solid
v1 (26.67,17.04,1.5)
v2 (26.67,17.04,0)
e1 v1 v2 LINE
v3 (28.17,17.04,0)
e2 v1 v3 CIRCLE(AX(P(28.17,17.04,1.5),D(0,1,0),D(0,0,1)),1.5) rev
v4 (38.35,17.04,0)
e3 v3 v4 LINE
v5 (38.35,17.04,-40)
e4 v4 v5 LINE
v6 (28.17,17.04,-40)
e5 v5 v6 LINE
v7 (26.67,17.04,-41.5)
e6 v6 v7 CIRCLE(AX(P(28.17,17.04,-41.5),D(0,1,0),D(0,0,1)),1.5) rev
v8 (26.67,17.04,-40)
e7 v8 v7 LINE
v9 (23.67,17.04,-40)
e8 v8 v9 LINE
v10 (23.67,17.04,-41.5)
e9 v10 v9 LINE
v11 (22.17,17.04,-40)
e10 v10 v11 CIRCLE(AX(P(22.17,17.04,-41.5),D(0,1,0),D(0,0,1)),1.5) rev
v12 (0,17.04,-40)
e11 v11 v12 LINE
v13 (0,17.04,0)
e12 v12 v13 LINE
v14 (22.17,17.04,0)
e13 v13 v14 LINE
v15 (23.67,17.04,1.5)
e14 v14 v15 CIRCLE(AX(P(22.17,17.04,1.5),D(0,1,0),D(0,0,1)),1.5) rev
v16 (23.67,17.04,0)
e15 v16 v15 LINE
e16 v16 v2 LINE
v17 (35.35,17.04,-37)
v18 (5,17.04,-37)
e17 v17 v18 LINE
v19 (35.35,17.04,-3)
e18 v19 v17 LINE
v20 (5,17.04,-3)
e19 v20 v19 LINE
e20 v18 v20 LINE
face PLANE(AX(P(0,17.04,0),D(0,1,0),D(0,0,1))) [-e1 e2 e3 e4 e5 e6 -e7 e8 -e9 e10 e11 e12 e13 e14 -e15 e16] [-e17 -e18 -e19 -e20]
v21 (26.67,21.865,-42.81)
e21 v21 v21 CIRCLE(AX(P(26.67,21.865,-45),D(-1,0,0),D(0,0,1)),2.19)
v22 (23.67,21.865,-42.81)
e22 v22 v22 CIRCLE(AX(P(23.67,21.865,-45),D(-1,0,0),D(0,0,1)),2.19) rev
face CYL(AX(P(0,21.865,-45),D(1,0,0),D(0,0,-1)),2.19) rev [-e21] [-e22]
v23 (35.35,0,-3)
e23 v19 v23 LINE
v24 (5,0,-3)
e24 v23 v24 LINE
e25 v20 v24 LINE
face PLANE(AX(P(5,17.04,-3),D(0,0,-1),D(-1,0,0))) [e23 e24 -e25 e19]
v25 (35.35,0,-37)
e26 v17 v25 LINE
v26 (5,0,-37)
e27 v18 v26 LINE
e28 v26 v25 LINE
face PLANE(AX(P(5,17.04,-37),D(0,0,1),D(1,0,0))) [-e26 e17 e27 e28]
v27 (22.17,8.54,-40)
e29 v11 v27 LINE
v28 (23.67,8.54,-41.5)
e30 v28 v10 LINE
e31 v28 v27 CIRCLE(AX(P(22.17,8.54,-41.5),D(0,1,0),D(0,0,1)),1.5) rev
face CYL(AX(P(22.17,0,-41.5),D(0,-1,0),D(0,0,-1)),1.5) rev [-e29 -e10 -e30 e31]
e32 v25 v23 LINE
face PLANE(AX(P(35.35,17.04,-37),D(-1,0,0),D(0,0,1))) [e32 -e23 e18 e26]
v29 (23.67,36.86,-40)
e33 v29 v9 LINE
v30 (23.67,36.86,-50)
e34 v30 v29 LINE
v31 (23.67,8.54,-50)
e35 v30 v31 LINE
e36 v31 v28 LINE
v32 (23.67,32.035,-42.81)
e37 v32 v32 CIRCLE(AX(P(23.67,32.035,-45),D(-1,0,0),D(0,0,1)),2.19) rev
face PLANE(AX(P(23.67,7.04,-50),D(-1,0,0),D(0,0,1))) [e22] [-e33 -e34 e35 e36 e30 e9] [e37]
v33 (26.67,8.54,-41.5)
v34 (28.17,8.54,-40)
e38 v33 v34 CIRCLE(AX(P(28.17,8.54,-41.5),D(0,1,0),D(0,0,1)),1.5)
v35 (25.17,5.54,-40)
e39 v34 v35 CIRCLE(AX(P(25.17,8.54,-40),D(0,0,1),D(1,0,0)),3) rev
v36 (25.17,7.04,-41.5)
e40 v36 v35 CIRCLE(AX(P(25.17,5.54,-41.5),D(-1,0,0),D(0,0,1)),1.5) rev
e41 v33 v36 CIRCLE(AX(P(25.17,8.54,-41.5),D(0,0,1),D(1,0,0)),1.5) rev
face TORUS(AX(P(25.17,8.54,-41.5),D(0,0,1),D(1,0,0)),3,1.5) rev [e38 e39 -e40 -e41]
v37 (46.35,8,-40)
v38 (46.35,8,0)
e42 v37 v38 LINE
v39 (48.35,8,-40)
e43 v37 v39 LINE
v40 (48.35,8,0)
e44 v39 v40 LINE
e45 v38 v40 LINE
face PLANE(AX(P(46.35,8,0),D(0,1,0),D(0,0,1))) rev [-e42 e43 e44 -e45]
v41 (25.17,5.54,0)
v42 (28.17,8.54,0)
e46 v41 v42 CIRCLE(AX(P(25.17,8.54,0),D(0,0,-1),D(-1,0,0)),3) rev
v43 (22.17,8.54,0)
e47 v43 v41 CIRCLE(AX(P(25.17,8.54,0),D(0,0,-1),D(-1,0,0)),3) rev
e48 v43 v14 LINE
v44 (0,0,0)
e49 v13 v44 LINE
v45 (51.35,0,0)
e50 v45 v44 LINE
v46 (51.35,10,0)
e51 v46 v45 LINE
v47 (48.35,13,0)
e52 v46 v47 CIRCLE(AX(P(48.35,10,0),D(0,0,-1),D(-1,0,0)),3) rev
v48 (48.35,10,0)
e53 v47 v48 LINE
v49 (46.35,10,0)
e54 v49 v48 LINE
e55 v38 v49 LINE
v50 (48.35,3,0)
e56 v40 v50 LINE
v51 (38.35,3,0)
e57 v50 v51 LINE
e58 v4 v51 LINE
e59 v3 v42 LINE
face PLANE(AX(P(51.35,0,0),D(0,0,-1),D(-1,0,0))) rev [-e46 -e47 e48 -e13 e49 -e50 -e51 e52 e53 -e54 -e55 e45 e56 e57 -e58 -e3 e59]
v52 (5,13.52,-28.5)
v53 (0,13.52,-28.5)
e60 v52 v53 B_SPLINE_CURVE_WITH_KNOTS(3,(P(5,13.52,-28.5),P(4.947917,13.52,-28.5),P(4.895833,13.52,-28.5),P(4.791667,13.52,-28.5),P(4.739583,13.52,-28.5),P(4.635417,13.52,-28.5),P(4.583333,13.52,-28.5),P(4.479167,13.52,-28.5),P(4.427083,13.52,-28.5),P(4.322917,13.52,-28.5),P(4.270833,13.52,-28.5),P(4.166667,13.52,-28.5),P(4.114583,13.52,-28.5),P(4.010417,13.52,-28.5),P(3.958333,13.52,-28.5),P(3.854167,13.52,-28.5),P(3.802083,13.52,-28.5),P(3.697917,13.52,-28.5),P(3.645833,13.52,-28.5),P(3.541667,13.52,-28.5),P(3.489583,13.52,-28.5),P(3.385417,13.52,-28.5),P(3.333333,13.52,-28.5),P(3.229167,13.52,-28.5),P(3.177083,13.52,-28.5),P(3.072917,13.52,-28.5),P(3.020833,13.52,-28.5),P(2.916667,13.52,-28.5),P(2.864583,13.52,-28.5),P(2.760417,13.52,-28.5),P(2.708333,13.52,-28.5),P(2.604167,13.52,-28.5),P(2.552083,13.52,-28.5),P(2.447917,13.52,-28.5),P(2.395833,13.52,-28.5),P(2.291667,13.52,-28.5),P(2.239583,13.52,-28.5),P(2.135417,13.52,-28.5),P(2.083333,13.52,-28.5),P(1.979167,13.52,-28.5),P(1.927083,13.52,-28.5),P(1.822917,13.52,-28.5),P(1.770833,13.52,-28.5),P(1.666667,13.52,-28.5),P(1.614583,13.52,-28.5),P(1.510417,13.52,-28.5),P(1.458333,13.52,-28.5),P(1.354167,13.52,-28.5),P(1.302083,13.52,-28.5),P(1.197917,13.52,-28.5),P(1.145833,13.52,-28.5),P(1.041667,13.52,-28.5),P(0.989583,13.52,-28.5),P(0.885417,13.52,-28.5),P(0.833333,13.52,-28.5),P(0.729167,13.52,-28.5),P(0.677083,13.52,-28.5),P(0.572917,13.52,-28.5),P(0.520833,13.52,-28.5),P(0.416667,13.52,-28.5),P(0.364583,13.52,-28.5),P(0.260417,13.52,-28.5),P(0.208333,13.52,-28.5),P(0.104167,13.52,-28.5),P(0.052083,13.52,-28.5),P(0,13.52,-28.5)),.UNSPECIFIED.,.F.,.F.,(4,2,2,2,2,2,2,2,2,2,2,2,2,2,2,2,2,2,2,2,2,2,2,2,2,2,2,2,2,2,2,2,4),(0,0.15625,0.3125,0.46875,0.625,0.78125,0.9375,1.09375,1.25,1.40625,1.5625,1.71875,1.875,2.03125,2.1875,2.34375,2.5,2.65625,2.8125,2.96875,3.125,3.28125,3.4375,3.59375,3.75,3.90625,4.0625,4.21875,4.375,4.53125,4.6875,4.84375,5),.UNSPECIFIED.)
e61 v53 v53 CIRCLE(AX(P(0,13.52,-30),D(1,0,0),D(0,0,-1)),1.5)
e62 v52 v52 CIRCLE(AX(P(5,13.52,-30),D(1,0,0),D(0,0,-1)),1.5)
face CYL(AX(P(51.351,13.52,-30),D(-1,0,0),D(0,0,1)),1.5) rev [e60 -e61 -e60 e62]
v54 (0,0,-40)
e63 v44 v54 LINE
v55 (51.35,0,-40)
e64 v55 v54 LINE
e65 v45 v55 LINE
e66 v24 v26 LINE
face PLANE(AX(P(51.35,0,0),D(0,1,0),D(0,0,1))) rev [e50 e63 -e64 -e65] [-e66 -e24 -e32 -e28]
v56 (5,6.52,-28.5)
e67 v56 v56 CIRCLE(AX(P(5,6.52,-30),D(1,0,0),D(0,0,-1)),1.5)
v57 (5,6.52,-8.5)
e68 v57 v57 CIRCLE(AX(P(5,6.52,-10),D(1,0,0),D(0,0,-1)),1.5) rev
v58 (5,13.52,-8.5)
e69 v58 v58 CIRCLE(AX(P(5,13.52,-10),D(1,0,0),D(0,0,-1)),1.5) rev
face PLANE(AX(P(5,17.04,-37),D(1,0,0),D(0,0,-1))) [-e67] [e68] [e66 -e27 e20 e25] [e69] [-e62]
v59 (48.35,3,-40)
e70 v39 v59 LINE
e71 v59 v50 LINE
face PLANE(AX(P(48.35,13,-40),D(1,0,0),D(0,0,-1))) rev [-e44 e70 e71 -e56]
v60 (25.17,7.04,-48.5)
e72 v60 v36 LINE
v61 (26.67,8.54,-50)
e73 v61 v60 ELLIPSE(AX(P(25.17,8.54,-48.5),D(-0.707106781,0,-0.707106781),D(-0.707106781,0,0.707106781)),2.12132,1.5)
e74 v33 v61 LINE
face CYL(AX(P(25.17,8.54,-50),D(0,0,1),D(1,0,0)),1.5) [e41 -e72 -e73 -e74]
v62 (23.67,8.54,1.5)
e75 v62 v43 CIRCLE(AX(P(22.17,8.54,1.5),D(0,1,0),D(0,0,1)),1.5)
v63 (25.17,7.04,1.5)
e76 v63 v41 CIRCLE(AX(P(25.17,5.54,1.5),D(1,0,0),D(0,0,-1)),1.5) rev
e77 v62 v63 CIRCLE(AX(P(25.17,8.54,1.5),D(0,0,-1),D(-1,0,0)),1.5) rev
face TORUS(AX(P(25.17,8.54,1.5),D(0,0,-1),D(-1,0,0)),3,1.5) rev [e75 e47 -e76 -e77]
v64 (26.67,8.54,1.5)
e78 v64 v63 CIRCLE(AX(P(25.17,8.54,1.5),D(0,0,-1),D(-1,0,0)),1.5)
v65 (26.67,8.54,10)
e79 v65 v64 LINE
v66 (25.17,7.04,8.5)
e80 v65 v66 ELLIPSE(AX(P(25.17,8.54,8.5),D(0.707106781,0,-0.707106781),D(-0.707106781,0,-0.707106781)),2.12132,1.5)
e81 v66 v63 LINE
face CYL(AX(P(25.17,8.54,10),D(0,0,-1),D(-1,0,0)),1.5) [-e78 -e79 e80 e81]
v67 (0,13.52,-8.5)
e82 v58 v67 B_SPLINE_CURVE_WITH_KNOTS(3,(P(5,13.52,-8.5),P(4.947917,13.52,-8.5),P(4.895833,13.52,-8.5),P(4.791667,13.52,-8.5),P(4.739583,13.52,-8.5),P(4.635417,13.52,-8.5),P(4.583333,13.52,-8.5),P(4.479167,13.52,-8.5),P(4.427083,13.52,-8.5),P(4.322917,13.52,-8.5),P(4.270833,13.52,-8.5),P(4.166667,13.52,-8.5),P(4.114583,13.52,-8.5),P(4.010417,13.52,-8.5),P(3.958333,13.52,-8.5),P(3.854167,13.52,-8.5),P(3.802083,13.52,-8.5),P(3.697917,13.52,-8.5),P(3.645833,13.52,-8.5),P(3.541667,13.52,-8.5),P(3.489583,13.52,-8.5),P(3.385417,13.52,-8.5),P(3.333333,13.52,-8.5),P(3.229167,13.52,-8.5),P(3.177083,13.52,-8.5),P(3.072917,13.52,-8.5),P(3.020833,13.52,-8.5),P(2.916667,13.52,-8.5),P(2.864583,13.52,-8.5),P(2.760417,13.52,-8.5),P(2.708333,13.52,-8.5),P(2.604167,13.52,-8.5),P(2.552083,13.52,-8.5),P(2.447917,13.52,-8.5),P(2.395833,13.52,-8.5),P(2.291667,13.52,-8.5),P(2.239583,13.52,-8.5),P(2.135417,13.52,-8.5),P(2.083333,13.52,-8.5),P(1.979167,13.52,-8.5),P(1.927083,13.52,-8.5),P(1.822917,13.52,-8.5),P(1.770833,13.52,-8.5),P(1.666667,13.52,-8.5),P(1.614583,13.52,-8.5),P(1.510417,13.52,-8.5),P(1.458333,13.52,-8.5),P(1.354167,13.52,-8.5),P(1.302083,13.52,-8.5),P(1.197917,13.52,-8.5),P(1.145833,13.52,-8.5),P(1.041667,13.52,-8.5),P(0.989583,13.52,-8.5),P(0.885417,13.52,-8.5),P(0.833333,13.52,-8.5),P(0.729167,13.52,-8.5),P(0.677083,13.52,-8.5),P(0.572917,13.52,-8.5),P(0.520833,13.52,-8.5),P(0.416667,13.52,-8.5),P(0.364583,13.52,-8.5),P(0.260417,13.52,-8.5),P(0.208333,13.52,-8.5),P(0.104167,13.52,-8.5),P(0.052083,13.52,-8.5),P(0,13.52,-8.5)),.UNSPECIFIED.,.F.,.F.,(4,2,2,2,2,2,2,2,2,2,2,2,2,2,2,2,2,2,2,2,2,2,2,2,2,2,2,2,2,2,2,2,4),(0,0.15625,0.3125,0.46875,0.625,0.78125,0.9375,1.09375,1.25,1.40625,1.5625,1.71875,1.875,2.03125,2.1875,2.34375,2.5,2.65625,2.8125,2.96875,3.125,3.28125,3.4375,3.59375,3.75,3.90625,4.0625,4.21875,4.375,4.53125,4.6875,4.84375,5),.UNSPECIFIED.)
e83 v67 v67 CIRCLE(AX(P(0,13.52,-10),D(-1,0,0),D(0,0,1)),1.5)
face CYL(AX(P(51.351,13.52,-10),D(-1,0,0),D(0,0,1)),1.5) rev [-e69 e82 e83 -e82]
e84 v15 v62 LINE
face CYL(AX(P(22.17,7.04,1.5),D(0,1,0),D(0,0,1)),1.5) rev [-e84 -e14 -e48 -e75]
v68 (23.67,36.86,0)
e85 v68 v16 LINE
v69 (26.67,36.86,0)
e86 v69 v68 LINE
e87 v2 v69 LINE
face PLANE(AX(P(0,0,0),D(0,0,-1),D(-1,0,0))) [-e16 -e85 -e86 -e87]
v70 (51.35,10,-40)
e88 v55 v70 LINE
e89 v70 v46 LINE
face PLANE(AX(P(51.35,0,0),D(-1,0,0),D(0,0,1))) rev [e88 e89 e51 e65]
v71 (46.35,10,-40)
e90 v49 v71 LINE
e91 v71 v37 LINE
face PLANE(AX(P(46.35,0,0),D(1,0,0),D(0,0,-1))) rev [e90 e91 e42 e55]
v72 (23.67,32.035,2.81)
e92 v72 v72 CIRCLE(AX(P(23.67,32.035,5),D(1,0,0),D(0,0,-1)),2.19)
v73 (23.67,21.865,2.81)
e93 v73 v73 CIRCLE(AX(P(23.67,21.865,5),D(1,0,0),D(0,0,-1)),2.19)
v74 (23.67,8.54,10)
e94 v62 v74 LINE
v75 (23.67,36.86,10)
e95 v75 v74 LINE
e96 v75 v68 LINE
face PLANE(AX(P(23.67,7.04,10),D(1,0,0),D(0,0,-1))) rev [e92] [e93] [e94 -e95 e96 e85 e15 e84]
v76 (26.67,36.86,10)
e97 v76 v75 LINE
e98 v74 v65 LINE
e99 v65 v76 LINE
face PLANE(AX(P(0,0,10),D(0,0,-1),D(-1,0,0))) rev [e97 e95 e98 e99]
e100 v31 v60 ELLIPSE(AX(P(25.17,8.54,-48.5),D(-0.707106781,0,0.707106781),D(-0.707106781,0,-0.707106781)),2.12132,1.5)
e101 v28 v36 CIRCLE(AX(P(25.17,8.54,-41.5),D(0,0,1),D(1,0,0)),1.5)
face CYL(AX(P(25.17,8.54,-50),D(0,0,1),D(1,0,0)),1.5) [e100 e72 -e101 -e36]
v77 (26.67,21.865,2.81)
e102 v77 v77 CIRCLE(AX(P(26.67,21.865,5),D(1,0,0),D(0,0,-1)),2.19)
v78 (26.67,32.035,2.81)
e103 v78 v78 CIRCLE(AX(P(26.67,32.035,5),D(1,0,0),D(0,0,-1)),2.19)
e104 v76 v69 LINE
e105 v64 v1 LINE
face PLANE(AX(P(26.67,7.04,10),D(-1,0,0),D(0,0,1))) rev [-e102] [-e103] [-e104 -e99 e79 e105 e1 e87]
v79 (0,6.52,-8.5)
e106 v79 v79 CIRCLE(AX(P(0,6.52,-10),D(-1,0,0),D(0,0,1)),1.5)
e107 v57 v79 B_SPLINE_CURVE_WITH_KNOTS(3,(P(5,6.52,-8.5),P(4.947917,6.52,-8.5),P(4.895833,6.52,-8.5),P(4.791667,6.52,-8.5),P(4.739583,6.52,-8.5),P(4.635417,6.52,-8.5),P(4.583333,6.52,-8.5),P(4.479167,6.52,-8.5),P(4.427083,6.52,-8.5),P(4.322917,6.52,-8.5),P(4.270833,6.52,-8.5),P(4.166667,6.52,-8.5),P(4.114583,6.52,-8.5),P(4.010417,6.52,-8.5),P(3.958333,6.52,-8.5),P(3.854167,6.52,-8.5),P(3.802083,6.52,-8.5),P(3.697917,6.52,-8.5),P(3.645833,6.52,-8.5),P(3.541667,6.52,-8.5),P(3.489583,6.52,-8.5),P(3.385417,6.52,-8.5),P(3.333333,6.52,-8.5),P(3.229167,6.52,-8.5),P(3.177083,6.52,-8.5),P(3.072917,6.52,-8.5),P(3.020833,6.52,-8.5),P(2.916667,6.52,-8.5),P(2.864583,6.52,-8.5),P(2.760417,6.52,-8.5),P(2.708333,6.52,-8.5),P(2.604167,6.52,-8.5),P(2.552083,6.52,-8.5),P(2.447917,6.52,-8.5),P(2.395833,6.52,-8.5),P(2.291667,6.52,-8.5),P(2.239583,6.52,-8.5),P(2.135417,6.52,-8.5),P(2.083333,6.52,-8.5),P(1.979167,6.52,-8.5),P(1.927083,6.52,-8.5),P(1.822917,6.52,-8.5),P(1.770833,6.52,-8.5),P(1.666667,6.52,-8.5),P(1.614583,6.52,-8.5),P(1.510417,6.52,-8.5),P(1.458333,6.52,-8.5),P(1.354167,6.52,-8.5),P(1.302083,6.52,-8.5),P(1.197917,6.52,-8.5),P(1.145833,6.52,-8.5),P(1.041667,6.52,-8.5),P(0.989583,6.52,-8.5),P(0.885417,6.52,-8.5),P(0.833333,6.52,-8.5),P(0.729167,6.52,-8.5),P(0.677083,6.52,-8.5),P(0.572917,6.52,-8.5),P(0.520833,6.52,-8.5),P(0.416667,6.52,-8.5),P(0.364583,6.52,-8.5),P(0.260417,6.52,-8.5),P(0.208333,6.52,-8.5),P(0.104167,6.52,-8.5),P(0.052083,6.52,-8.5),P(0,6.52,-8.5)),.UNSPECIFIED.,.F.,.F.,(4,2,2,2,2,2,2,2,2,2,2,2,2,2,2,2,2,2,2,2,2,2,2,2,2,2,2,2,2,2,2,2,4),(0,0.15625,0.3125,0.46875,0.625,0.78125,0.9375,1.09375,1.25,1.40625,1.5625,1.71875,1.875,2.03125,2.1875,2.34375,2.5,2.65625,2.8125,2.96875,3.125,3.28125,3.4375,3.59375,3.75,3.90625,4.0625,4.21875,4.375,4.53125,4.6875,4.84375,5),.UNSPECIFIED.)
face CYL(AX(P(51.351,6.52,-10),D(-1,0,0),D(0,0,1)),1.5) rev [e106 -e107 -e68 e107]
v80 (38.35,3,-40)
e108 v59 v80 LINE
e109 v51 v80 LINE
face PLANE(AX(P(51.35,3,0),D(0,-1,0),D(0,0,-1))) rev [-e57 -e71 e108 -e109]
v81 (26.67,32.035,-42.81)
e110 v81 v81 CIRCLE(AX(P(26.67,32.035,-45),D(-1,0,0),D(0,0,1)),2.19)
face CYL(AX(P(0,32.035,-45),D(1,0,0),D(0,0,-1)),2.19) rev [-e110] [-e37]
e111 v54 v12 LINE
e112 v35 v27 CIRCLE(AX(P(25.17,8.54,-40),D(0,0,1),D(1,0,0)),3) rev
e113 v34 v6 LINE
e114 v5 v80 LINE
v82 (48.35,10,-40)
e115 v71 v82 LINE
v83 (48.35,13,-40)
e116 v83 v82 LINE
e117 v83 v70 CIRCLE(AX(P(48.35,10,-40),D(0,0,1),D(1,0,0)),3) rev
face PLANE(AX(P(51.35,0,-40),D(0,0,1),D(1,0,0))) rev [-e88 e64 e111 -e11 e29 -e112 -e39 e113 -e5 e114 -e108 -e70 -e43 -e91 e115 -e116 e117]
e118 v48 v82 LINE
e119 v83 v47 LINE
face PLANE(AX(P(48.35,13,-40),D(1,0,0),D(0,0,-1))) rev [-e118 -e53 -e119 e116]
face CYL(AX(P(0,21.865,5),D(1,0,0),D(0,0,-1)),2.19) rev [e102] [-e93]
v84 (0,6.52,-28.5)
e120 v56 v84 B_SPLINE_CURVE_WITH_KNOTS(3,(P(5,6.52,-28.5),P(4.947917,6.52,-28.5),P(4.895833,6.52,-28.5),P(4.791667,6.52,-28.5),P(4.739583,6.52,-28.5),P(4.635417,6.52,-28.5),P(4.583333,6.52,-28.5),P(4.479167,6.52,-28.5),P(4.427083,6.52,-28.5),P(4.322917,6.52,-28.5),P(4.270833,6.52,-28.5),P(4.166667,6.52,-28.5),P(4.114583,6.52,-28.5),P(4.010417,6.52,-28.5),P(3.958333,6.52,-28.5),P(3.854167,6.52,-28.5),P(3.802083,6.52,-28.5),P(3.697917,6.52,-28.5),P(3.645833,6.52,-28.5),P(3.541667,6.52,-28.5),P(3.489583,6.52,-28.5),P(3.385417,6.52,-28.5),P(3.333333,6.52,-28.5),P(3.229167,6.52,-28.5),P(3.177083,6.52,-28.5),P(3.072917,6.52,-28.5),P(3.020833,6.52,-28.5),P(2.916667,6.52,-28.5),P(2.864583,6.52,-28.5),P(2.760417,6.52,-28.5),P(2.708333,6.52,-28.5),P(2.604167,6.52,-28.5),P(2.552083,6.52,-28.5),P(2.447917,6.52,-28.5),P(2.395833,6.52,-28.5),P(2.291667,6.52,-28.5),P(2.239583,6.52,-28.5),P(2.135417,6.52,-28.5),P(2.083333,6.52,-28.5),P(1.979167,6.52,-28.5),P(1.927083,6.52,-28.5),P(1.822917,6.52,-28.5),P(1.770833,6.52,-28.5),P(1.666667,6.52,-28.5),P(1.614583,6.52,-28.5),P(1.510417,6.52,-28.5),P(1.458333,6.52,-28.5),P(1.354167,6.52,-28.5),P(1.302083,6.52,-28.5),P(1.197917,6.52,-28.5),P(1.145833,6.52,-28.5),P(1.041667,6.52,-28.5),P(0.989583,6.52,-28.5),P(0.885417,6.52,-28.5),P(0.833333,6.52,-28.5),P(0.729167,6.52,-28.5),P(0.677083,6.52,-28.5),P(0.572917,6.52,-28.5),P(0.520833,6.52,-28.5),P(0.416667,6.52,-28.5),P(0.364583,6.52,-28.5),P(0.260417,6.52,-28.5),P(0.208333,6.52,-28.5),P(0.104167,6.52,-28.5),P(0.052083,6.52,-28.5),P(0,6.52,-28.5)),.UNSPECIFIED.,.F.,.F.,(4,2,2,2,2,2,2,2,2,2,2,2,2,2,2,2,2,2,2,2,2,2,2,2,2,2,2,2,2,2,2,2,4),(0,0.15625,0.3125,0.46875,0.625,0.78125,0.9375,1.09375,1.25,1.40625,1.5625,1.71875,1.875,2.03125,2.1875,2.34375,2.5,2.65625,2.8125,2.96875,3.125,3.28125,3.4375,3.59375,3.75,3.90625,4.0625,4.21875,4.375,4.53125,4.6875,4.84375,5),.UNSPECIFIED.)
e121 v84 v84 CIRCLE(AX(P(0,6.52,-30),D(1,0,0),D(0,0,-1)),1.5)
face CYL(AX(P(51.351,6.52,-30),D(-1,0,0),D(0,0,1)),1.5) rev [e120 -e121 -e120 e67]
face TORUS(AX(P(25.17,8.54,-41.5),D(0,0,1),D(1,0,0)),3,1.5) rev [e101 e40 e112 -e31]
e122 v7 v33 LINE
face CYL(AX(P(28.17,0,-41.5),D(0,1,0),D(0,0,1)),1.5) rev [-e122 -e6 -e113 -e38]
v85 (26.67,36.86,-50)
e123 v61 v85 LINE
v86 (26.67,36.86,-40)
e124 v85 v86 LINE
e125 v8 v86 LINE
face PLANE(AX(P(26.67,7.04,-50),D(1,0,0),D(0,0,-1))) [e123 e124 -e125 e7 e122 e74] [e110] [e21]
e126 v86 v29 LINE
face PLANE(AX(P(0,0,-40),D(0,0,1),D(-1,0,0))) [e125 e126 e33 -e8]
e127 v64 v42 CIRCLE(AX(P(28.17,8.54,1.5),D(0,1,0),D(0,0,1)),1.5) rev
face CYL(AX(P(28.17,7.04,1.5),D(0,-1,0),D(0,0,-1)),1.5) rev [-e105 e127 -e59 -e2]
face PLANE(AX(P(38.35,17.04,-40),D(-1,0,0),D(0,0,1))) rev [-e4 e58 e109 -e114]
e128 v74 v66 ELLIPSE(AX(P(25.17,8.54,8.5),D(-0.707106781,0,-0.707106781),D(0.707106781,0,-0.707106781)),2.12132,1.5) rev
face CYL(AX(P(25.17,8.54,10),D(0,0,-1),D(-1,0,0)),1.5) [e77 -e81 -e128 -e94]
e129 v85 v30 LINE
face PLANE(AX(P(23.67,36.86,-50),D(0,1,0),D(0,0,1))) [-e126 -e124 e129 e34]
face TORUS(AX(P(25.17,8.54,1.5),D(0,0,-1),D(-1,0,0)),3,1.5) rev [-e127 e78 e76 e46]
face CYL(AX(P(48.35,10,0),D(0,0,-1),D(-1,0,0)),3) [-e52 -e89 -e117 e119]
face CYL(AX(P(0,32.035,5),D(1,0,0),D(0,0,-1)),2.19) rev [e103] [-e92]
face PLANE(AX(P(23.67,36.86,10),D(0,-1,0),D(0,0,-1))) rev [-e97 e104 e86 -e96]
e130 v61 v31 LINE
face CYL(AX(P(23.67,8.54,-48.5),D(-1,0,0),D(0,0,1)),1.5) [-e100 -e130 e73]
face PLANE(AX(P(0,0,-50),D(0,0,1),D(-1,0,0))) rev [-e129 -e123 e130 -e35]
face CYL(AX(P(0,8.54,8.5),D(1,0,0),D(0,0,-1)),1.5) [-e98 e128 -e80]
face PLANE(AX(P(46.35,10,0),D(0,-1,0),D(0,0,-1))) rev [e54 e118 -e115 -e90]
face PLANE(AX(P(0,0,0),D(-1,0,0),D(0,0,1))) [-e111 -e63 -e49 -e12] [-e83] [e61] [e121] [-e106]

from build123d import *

# Parameters (mm, degrees)
SKETCH1_W           = 40
SKETCH1_H           = 3
BOSS_EXTRUDE1_DEPTH = 51.35
SKETCH2_W           = 3
SKETCH2_H           = 40
BOSS_EXTRUDE2_DEPTH = 10
FILLET1_R           = 3
SKETCH3_W           = 40
SKETCH3_H           = 2
BOSS_EXTRUDE3_DEPTH = 2
SKETCH4_W           = 30.35
SKETCH4_H           = 34
BOSS_EXTRUDE4_DEPTH = 14.04
SKETCH5_W           = 3
SKETCH5_H           = 29.82
BOSS_EXTRUDE5_DEPTH = 10
FILLET3_R           = 1.5
SKETCH6_R           = 2.19
CUT_EXTRUDE1_DEPTH  = 68.601394216
CUT_EXTRUDE2_REACH  = 82.595
SKETCH7_R           = 1.5
SKETCH8_W           = 30.35
SKETCH8_H           = 34
CUT_EXTRUDE3_DEPTH  = 3


with BuildPart() as part:
    # Sketch1 → Boss-Extrude1 (new body)
    with BuildSketch(Plane(origin=(0, 0, 0), x_dir=(0, 0, -1), z_dir=(1, 0, 0))):
        with Locations((20, 1.5)):
            Rectangle(SKETCH1_W, SKETCH1_H)
    extrude(amount=BOSS_EXTRUDE1_DEPTH)

    # Sketch2 → Boss-Extrude2 (add)
    with BuildSketch(Plane(origin=(0, 3, 0), x_dir=(1, 0, 0), z_dir=(0, 1, 0))):
        with Locations((49.85, 20)):
            Rectangle(SKETCH2_W, SKETCH2_H)
    extrude(amount=BOSS_EXTRUDE2_DEPTH)

    # Fillet1
    fillet1_edges = [part.edges().sort_by_distance(p)[0] for p in [
        (51.35, 13, -20),
    ]]
    fillet(fillet1_edges, radius=FILLET1_R - 0.0001)  # a hair under: the kernel refuses the full size

    # Sketch3 → Boss-Extrude3 (add)
    with BuildSketch(Plane.ZY.offset(-48.35)):
        with Locations((-20, 9)):
            Rectangle(SKETCH3_W, SKETCH3_H)
    extrude(amount=BOSS_EXTRUDE3_DEPTH)

    # Sketch4 → Boss-Extrude4 (add)
    with BuildSketch(Plane(origin=(0, 3, 0), x_dir=(1, 0, 0), z_dir=(0, 1, 0))):
        Polygon((0, 40), (3, 40), (38.35, 40), (38.35, 37), (38.35, 3), (38.35, 0), (3, 0), (0, 0), align=None)
        with Locations((20.175, 20)):
            Rectangle(SKETCH4_W, SKETCH4_H, mode=Mode.SUBTRACT)
    extrude(amount=BOSS_EXTRUDE4_DEPTH)

    # Sketch5 → Boss-Extrude5 (add)
    with BuildSketch(Plane.XY):
        with Locations((25.17, 21.95)):
            Rectangle(SKETCH5_W, SKETCH5_H)
    boss_extrude5 = extrude(amount=BOSS_EXTRUDE5_DEPTH)

    # Mirror2: Boss-Extrude5 across plane
    add(boss_extrude5.mirror(Plane(origin=(0, 0, -20), x_dir=(1, 0, 0), z_dir=(0, 0, -1))))

    # Fillet3
    fillet3_edges = [part.edges().sort_by_distance(p)[0] for p in [
        (23.67, 12.04, 0),
        (25.17, 7.04, 0),
        (23.67, 7.04, 5),
        (26.67, 12.04, 0),
        (26.67, 7.04, 5),
        (25.17, 7.04, 10),
        (23.67, 12.04, -40),
        (23.67, 7.04, -45),
        (25.17, 7.04, -50),
        (26.67, 7.04, -45),
        (26.67, 12.04, -40),
        (25.17, 7.04, -40),
    ]]
    fillet(fillet3_edges, radius=FILLET3_R - 0.0001)  # a hair under: the kernel refuses the full size

    # Sketch6 → Cut-Extrude1 (cut, through all)
    with BuildSketch(Plane(origin=(26.67, 0, 0), x_dir=(0, 0, -1), z_dir=(1, 0, 0))):
        with Locations((-5, 32.035)):
            Circle(SKETCH6_R)
        with Locations((-5, 21.865)):
            Circle(SKETCH6_R)
    cut_extrude1 = extrude(amount=-CUT_EXTRUDE1_DEPTH, mode=Mode.SUBTRACT)

    # Mirror3: Cut-Extrude1 across plane
    add(cut_extrude1.mirror(Plane(origin=(0, 0, -20), x_dir=(1, 0, 0), z_dir=(0, 0, -1))), mode=Mode.SUBTRACT)

    # Sketch7 → Cut-Extrude2 (cut, up to next)
    with BuildSketch(Plane.ZY, mode=Mode.PRIVATE) as cut_extrude2_sk1:
        with Locations((-10, 13.52)):
            Circle(SKETCH7_R)
    cut_extrude2_tool1 = extrude(cut_extrude2_sk1.sketch, amount=-CUT_EXTRUDE2_REACH, mode=Mode.PRIVATE) & part.part
    # Sketch7 → Cut-Extrude2 (cut, up to next)
    with BuildSketch(Plane.ZY, mode=Mode.PRIVATE) as cut_extrude2_sk2:
        with Locations((-10, 6.52)):
            Circle(SKETCH7_R)
    cut_extrude2_tool2 = extrude(cut_extrude2_sk2.sketch, amount=-CUT_EXTRUDE2_REACH, mode=Mode.PRIVATE) & part.part
    cut_extrude2_1 = cut_extrude2_tool1.solids().sort_by_distance((0, 13.52, -10))[0]
    add(cut_extrude2_1, mode=Mode.SUBTRACT)
    cut_extrude2_2 = cut_extrude2_tool2.solids().sort_by_distance((0, 6.52, -10))[0]
    add(cut_extrude2_2, mode=Mode.SUBTRACT)
    cut_extrude2 = cut_extrude2_1 + cut_extrude2_2  # Cut-Extrude2 as one shape, for the pattern or mirror that repeats it

    # Mirror4: Cut-Extrude2 across plane
    add(cut_extrude2.mirror(Plane(origin=(0, 0, -20), x_dir=(1, 0, 0), z_dir=(0, 0, -1))), mode=Mode.SUBTRACT)

    # Sketch8 → Cut-Extrude3 (cut)
    with BuildSketch(Plane(origin=(0, 3, 0), x_dir=(1, 0, 0), z_dir=(0, 1, 0))):
        with Locations((20.175, 20)):
            Rectangle(SKETCH8_W, SKETCH8_H)
    extrude(amount=-CUT_EXTRUDE3_DEPTH, mode=Mode.SUBTRACT)


solid = part.part
